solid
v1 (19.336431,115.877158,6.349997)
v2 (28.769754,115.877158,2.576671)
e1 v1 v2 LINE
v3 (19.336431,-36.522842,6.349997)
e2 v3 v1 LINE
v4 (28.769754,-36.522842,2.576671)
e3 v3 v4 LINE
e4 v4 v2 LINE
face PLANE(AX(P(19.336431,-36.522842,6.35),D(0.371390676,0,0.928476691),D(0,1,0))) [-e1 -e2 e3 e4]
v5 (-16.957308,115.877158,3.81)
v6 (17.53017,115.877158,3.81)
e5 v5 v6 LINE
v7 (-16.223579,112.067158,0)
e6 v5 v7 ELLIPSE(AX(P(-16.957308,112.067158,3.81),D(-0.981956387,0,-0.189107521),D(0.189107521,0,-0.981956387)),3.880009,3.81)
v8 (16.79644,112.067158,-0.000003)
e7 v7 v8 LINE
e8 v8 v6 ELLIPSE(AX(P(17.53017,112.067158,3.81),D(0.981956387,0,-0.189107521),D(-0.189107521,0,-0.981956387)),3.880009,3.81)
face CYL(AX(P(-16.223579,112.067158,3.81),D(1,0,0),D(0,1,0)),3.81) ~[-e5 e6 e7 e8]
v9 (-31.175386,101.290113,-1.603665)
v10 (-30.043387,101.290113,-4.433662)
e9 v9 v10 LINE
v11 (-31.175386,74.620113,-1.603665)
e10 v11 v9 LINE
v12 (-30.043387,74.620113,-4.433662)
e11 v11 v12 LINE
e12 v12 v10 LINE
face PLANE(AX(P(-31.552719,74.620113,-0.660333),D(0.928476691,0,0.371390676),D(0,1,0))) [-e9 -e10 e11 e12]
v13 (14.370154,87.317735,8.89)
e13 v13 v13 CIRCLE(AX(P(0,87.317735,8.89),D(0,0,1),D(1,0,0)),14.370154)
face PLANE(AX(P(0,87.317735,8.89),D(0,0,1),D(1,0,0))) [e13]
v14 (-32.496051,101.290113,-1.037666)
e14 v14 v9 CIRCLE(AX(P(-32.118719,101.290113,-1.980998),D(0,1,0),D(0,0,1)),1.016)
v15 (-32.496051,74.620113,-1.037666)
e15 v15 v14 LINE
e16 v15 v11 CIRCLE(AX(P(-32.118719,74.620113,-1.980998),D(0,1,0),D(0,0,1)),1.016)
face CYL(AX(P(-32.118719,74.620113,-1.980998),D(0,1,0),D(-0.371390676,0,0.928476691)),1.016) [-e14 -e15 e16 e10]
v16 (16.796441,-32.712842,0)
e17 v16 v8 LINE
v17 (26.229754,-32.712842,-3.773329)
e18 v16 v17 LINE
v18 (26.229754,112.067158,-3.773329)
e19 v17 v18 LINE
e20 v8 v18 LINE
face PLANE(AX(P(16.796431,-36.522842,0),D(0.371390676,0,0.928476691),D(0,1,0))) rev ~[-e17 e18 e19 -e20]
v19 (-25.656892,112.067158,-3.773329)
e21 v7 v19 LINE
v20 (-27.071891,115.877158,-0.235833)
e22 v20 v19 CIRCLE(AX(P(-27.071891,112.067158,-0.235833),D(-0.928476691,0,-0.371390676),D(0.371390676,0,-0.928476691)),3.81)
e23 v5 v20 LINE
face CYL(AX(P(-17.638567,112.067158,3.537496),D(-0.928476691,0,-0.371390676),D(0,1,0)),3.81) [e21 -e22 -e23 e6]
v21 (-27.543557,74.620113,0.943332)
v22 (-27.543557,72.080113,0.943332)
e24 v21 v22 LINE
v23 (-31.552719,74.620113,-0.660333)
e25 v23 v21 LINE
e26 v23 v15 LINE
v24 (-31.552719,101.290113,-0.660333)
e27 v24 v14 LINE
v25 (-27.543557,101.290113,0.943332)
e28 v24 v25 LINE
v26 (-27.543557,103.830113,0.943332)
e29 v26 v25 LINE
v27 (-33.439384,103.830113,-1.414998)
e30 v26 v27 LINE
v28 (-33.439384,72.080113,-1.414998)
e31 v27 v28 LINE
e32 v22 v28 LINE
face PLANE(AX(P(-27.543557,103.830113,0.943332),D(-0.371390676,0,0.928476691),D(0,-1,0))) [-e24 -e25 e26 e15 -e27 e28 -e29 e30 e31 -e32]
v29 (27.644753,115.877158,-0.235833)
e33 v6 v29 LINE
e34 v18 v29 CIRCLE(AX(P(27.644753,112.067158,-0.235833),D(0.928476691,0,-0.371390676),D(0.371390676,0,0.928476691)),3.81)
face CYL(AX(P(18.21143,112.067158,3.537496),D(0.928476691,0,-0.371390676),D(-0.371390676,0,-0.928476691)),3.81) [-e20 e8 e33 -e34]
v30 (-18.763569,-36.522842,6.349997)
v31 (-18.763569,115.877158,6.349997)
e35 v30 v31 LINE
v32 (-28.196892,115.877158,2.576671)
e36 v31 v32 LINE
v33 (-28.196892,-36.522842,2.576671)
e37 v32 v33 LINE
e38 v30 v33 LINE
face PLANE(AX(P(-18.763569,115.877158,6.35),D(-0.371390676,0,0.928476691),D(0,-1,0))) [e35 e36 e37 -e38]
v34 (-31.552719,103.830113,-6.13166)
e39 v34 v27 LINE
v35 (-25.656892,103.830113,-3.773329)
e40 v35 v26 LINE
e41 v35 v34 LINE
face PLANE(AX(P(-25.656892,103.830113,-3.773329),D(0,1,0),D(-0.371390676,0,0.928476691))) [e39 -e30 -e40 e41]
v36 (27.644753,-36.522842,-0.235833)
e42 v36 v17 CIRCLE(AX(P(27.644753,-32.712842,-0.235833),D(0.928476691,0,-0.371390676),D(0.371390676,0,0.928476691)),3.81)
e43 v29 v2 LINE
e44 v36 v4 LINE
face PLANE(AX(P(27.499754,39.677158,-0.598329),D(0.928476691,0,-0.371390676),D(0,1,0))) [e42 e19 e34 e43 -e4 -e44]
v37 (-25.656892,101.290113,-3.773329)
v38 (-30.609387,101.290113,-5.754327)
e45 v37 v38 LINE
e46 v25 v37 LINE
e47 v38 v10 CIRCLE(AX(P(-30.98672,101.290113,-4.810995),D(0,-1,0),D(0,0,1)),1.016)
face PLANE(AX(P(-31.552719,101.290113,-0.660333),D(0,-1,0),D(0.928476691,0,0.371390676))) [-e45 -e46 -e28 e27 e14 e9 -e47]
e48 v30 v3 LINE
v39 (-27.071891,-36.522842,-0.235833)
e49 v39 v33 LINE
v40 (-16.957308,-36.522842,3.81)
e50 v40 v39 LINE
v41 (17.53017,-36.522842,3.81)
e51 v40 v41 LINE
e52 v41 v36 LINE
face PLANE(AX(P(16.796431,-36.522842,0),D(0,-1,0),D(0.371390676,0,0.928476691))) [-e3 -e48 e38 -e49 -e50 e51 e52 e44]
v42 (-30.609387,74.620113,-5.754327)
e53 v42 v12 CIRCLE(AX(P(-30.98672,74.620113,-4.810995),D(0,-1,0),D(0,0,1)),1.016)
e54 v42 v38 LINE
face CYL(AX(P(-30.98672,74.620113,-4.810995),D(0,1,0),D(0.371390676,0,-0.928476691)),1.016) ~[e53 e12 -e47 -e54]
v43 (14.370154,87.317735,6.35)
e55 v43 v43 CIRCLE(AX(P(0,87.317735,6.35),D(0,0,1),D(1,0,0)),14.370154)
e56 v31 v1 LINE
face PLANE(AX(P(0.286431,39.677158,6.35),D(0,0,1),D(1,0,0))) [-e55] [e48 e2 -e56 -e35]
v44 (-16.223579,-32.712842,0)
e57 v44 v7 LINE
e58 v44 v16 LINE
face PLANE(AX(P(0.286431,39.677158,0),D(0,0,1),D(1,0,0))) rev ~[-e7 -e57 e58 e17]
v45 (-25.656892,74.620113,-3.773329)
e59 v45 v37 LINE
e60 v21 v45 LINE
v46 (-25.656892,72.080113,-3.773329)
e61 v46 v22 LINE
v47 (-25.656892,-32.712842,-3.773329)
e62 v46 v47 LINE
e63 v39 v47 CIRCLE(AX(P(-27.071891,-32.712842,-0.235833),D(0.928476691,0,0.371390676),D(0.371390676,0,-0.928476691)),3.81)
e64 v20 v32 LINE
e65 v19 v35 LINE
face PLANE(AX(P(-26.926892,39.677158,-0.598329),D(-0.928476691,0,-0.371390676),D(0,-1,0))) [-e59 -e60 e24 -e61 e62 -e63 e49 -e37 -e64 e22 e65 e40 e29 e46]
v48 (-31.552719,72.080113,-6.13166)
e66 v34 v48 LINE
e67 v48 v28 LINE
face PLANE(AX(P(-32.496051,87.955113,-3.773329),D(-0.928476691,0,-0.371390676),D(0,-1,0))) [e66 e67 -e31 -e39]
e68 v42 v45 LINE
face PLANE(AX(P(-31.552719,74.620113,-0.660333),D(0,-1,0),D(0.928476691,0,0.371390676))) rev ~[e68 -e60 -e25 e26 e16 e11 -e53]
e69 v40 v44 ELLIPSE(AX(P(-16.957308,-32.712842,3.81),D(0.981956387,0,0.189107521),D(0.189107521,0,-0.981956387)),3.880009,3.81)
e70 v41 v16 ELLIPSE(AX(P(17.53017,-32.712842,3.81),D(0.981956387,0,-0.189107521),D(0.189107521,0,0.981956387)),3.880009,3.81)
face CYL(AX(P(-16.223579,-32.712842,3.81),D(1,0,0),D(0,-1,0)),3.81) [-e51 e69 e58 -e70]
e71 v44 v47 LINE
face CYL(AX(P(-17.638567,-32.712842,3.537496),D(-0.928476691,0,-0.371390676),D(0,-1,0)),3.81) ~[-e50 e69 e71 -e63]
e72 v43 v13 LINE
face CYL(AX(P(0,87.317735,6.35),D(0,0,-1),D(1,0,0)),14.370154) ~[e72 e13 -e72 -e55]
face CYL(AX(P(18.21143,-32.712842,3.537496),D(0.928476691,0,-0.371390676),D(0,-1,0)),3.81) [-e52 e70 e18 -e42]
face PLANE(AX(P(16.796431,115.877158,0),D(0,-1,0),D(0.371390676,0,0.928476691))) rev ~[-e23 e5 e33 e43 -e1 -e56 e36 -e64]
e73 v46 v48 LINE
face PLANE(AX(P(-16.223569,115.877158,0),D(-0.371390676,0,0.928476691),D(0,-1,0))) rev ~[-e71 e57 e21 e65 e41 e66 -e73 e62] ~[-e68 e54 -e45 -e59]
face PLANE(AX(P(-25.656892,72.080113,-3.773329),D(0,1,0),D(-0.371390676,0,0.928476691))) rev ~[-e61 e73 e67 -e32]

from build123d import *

# Parameters (mm, degrees)
F0_W       = 38.1
F0_H       = 152.4
F1_DEPTH   = 6.35
F2_SIZE2   = 2.53999
F2_SIZE    = 6.34999
F2_2_SIZE2 = 2.53999
F2_2_SIZE  = 6.34999
F3_W       = 152.4
F3_H       = 6.8391593051
F4_DEPTH   = 10.16
F5_W       = 152.4
F5_H       = 6.8391593051
F6_DEPTH   = 10.16
F7_R       = 3.81
F8_W       = 31.75
F8_H       = 5.08
F9_DEPTH   = 6.35
F10_W      = 4.318
F10_H      = 26.67
F11_DEPTH  = 25.4
F12_R      = 1.016
F13_R      = 14.3701538506
F14_DEPTH  = 2.54


# Not quite as in the source:
# - a fillet or chamfer is up to 0.001 mm smaller than in the source, because OpenCascade refuses the exact size


with BuildPart() as f1:
    # F0 (on Top) → F1 (new body)
    with BuildSketch(Plane.XY):
        with Locations((0.2864310518, 39.6771576124)):
            Rectangle(F0_W, F0_H)
    extrude(amount=F1_DEPTH)

    # F2 (size 6.35 and 2.54 in the source; OpenCascade refuses exactly that, so slightly less here)
    f2_edges = [f1.edges().sort_by_distance(p)[0] for p in [
        (-18.763569, 39.677158, 0),
    ]]
    f2_side = f1.faces().sort_by_distance((-18.763569, 39.677158, 3.175))[0]
    chamfer(f2_edges, length=F2_SIZE, length2=F2_SIZE2, reference=f2_side)

    # F2#2 (size 6.35 and 2.54 in the source; OpenCascade refuses exactly that, so slightly less here)
    f2_2_edges = [f1.edges().sort_by_distance(p)[0] for p in [
        (19.336431, 39.677158, 0),
    ]]
    f2_2_side = f1.faces().sort_by_distance((19.336431, 39.677158, 3.175))[0]
    chamfer(f2_2_edges, length=F2_2_SIZE, length2=F2_2_SIZE2, reference=f2_2_side)

    # F3 (on face) → F4 (join)
    with BuildSketch(Plane(origin=(-13.9858353002, 0, -5.5943341201), x_dir=(0, -1, 0), z_dir=(-0.9284766909, 0, -0.3713906764))):
        with Locations((-39.6771576124, 9.4448618971)):
            Rectangle(F3_W, F3_H)
    extrude(amount=F4_DEPTH)

    # F5 (on face) → F6 (join)
    with BuildSketch(Plane(origin=(14.4796819412, 0, -5.7918727765), x_dir=(0, 1, 0), z_dir=(0.9284766909, 0, -0.3713906764))):
        with Locations((39.6771576124, 9.6576175412)):
            Rectangle(F5_W, F5_H)
    extrude(amount=F6_DEPTH)

    # F7
    f7_edges = [f1.edges().sort_by_distance(p)[0] for p in [
        (0.286431, -36.522842, 0),
        (-20.940231, -36.522842, -1.886665),
        (21.513093, -36.522842, -1.886665),
        (21.513093, 115.877158, -1.886665),
        (0.286431, 115.877158, 0),
        (-20.940231, 115.877158, -1.886665),
    ]]
    fillet(f7_edges, radius=F7_R)

    # F8 (on face) → F9 (join)
    with BuildSketch(Plane(origin=(-23.4191584796, 0, -9.3676633918), x_dir=(0, -1, 0), z_dir=(-0.9284766909, 0, -0.3713906764))):
        with Locations((-87.9551129937, 8.5652822446)):
            Rectangle(F8_W, F8_H)
    extrude(amount=F9_DEPTH)

    # F10 (on face) → F11 (cut)
    with BuildSketch(Plane(origin=(-4.1243982839, 0, 10.3109957098), x_dir=(0.9284766909, 0, 0.3713906764), z_dir=(-0.3713906764, 0, 0.9284766909))):
        with Locations((-27.3822056114, 87.9551129937)):
            Rectangle(F10_W, F10_H)
    extrude(amount=-F11_DEPTH, mode=Mode.SUBTRACT)

    # F12
    f12_edges = [f1.edges().sort_by_distance(p)[0] for p in [
        (-31.552719, 87.955113, -0.660333),
        (-29.666054, 87.955113, -5.376994),
    ]]
    fillet(f12_edges, radius=F12_R)

    # F13 (on face) → F14 (join)
    with BuildSketch(Plane.XY.offset(6.35)):
        with Locations((0, 87.3177349567)):
            Circle(F13_R)
    extrude(amount=F14_DEPTH)


solid = f1.part
